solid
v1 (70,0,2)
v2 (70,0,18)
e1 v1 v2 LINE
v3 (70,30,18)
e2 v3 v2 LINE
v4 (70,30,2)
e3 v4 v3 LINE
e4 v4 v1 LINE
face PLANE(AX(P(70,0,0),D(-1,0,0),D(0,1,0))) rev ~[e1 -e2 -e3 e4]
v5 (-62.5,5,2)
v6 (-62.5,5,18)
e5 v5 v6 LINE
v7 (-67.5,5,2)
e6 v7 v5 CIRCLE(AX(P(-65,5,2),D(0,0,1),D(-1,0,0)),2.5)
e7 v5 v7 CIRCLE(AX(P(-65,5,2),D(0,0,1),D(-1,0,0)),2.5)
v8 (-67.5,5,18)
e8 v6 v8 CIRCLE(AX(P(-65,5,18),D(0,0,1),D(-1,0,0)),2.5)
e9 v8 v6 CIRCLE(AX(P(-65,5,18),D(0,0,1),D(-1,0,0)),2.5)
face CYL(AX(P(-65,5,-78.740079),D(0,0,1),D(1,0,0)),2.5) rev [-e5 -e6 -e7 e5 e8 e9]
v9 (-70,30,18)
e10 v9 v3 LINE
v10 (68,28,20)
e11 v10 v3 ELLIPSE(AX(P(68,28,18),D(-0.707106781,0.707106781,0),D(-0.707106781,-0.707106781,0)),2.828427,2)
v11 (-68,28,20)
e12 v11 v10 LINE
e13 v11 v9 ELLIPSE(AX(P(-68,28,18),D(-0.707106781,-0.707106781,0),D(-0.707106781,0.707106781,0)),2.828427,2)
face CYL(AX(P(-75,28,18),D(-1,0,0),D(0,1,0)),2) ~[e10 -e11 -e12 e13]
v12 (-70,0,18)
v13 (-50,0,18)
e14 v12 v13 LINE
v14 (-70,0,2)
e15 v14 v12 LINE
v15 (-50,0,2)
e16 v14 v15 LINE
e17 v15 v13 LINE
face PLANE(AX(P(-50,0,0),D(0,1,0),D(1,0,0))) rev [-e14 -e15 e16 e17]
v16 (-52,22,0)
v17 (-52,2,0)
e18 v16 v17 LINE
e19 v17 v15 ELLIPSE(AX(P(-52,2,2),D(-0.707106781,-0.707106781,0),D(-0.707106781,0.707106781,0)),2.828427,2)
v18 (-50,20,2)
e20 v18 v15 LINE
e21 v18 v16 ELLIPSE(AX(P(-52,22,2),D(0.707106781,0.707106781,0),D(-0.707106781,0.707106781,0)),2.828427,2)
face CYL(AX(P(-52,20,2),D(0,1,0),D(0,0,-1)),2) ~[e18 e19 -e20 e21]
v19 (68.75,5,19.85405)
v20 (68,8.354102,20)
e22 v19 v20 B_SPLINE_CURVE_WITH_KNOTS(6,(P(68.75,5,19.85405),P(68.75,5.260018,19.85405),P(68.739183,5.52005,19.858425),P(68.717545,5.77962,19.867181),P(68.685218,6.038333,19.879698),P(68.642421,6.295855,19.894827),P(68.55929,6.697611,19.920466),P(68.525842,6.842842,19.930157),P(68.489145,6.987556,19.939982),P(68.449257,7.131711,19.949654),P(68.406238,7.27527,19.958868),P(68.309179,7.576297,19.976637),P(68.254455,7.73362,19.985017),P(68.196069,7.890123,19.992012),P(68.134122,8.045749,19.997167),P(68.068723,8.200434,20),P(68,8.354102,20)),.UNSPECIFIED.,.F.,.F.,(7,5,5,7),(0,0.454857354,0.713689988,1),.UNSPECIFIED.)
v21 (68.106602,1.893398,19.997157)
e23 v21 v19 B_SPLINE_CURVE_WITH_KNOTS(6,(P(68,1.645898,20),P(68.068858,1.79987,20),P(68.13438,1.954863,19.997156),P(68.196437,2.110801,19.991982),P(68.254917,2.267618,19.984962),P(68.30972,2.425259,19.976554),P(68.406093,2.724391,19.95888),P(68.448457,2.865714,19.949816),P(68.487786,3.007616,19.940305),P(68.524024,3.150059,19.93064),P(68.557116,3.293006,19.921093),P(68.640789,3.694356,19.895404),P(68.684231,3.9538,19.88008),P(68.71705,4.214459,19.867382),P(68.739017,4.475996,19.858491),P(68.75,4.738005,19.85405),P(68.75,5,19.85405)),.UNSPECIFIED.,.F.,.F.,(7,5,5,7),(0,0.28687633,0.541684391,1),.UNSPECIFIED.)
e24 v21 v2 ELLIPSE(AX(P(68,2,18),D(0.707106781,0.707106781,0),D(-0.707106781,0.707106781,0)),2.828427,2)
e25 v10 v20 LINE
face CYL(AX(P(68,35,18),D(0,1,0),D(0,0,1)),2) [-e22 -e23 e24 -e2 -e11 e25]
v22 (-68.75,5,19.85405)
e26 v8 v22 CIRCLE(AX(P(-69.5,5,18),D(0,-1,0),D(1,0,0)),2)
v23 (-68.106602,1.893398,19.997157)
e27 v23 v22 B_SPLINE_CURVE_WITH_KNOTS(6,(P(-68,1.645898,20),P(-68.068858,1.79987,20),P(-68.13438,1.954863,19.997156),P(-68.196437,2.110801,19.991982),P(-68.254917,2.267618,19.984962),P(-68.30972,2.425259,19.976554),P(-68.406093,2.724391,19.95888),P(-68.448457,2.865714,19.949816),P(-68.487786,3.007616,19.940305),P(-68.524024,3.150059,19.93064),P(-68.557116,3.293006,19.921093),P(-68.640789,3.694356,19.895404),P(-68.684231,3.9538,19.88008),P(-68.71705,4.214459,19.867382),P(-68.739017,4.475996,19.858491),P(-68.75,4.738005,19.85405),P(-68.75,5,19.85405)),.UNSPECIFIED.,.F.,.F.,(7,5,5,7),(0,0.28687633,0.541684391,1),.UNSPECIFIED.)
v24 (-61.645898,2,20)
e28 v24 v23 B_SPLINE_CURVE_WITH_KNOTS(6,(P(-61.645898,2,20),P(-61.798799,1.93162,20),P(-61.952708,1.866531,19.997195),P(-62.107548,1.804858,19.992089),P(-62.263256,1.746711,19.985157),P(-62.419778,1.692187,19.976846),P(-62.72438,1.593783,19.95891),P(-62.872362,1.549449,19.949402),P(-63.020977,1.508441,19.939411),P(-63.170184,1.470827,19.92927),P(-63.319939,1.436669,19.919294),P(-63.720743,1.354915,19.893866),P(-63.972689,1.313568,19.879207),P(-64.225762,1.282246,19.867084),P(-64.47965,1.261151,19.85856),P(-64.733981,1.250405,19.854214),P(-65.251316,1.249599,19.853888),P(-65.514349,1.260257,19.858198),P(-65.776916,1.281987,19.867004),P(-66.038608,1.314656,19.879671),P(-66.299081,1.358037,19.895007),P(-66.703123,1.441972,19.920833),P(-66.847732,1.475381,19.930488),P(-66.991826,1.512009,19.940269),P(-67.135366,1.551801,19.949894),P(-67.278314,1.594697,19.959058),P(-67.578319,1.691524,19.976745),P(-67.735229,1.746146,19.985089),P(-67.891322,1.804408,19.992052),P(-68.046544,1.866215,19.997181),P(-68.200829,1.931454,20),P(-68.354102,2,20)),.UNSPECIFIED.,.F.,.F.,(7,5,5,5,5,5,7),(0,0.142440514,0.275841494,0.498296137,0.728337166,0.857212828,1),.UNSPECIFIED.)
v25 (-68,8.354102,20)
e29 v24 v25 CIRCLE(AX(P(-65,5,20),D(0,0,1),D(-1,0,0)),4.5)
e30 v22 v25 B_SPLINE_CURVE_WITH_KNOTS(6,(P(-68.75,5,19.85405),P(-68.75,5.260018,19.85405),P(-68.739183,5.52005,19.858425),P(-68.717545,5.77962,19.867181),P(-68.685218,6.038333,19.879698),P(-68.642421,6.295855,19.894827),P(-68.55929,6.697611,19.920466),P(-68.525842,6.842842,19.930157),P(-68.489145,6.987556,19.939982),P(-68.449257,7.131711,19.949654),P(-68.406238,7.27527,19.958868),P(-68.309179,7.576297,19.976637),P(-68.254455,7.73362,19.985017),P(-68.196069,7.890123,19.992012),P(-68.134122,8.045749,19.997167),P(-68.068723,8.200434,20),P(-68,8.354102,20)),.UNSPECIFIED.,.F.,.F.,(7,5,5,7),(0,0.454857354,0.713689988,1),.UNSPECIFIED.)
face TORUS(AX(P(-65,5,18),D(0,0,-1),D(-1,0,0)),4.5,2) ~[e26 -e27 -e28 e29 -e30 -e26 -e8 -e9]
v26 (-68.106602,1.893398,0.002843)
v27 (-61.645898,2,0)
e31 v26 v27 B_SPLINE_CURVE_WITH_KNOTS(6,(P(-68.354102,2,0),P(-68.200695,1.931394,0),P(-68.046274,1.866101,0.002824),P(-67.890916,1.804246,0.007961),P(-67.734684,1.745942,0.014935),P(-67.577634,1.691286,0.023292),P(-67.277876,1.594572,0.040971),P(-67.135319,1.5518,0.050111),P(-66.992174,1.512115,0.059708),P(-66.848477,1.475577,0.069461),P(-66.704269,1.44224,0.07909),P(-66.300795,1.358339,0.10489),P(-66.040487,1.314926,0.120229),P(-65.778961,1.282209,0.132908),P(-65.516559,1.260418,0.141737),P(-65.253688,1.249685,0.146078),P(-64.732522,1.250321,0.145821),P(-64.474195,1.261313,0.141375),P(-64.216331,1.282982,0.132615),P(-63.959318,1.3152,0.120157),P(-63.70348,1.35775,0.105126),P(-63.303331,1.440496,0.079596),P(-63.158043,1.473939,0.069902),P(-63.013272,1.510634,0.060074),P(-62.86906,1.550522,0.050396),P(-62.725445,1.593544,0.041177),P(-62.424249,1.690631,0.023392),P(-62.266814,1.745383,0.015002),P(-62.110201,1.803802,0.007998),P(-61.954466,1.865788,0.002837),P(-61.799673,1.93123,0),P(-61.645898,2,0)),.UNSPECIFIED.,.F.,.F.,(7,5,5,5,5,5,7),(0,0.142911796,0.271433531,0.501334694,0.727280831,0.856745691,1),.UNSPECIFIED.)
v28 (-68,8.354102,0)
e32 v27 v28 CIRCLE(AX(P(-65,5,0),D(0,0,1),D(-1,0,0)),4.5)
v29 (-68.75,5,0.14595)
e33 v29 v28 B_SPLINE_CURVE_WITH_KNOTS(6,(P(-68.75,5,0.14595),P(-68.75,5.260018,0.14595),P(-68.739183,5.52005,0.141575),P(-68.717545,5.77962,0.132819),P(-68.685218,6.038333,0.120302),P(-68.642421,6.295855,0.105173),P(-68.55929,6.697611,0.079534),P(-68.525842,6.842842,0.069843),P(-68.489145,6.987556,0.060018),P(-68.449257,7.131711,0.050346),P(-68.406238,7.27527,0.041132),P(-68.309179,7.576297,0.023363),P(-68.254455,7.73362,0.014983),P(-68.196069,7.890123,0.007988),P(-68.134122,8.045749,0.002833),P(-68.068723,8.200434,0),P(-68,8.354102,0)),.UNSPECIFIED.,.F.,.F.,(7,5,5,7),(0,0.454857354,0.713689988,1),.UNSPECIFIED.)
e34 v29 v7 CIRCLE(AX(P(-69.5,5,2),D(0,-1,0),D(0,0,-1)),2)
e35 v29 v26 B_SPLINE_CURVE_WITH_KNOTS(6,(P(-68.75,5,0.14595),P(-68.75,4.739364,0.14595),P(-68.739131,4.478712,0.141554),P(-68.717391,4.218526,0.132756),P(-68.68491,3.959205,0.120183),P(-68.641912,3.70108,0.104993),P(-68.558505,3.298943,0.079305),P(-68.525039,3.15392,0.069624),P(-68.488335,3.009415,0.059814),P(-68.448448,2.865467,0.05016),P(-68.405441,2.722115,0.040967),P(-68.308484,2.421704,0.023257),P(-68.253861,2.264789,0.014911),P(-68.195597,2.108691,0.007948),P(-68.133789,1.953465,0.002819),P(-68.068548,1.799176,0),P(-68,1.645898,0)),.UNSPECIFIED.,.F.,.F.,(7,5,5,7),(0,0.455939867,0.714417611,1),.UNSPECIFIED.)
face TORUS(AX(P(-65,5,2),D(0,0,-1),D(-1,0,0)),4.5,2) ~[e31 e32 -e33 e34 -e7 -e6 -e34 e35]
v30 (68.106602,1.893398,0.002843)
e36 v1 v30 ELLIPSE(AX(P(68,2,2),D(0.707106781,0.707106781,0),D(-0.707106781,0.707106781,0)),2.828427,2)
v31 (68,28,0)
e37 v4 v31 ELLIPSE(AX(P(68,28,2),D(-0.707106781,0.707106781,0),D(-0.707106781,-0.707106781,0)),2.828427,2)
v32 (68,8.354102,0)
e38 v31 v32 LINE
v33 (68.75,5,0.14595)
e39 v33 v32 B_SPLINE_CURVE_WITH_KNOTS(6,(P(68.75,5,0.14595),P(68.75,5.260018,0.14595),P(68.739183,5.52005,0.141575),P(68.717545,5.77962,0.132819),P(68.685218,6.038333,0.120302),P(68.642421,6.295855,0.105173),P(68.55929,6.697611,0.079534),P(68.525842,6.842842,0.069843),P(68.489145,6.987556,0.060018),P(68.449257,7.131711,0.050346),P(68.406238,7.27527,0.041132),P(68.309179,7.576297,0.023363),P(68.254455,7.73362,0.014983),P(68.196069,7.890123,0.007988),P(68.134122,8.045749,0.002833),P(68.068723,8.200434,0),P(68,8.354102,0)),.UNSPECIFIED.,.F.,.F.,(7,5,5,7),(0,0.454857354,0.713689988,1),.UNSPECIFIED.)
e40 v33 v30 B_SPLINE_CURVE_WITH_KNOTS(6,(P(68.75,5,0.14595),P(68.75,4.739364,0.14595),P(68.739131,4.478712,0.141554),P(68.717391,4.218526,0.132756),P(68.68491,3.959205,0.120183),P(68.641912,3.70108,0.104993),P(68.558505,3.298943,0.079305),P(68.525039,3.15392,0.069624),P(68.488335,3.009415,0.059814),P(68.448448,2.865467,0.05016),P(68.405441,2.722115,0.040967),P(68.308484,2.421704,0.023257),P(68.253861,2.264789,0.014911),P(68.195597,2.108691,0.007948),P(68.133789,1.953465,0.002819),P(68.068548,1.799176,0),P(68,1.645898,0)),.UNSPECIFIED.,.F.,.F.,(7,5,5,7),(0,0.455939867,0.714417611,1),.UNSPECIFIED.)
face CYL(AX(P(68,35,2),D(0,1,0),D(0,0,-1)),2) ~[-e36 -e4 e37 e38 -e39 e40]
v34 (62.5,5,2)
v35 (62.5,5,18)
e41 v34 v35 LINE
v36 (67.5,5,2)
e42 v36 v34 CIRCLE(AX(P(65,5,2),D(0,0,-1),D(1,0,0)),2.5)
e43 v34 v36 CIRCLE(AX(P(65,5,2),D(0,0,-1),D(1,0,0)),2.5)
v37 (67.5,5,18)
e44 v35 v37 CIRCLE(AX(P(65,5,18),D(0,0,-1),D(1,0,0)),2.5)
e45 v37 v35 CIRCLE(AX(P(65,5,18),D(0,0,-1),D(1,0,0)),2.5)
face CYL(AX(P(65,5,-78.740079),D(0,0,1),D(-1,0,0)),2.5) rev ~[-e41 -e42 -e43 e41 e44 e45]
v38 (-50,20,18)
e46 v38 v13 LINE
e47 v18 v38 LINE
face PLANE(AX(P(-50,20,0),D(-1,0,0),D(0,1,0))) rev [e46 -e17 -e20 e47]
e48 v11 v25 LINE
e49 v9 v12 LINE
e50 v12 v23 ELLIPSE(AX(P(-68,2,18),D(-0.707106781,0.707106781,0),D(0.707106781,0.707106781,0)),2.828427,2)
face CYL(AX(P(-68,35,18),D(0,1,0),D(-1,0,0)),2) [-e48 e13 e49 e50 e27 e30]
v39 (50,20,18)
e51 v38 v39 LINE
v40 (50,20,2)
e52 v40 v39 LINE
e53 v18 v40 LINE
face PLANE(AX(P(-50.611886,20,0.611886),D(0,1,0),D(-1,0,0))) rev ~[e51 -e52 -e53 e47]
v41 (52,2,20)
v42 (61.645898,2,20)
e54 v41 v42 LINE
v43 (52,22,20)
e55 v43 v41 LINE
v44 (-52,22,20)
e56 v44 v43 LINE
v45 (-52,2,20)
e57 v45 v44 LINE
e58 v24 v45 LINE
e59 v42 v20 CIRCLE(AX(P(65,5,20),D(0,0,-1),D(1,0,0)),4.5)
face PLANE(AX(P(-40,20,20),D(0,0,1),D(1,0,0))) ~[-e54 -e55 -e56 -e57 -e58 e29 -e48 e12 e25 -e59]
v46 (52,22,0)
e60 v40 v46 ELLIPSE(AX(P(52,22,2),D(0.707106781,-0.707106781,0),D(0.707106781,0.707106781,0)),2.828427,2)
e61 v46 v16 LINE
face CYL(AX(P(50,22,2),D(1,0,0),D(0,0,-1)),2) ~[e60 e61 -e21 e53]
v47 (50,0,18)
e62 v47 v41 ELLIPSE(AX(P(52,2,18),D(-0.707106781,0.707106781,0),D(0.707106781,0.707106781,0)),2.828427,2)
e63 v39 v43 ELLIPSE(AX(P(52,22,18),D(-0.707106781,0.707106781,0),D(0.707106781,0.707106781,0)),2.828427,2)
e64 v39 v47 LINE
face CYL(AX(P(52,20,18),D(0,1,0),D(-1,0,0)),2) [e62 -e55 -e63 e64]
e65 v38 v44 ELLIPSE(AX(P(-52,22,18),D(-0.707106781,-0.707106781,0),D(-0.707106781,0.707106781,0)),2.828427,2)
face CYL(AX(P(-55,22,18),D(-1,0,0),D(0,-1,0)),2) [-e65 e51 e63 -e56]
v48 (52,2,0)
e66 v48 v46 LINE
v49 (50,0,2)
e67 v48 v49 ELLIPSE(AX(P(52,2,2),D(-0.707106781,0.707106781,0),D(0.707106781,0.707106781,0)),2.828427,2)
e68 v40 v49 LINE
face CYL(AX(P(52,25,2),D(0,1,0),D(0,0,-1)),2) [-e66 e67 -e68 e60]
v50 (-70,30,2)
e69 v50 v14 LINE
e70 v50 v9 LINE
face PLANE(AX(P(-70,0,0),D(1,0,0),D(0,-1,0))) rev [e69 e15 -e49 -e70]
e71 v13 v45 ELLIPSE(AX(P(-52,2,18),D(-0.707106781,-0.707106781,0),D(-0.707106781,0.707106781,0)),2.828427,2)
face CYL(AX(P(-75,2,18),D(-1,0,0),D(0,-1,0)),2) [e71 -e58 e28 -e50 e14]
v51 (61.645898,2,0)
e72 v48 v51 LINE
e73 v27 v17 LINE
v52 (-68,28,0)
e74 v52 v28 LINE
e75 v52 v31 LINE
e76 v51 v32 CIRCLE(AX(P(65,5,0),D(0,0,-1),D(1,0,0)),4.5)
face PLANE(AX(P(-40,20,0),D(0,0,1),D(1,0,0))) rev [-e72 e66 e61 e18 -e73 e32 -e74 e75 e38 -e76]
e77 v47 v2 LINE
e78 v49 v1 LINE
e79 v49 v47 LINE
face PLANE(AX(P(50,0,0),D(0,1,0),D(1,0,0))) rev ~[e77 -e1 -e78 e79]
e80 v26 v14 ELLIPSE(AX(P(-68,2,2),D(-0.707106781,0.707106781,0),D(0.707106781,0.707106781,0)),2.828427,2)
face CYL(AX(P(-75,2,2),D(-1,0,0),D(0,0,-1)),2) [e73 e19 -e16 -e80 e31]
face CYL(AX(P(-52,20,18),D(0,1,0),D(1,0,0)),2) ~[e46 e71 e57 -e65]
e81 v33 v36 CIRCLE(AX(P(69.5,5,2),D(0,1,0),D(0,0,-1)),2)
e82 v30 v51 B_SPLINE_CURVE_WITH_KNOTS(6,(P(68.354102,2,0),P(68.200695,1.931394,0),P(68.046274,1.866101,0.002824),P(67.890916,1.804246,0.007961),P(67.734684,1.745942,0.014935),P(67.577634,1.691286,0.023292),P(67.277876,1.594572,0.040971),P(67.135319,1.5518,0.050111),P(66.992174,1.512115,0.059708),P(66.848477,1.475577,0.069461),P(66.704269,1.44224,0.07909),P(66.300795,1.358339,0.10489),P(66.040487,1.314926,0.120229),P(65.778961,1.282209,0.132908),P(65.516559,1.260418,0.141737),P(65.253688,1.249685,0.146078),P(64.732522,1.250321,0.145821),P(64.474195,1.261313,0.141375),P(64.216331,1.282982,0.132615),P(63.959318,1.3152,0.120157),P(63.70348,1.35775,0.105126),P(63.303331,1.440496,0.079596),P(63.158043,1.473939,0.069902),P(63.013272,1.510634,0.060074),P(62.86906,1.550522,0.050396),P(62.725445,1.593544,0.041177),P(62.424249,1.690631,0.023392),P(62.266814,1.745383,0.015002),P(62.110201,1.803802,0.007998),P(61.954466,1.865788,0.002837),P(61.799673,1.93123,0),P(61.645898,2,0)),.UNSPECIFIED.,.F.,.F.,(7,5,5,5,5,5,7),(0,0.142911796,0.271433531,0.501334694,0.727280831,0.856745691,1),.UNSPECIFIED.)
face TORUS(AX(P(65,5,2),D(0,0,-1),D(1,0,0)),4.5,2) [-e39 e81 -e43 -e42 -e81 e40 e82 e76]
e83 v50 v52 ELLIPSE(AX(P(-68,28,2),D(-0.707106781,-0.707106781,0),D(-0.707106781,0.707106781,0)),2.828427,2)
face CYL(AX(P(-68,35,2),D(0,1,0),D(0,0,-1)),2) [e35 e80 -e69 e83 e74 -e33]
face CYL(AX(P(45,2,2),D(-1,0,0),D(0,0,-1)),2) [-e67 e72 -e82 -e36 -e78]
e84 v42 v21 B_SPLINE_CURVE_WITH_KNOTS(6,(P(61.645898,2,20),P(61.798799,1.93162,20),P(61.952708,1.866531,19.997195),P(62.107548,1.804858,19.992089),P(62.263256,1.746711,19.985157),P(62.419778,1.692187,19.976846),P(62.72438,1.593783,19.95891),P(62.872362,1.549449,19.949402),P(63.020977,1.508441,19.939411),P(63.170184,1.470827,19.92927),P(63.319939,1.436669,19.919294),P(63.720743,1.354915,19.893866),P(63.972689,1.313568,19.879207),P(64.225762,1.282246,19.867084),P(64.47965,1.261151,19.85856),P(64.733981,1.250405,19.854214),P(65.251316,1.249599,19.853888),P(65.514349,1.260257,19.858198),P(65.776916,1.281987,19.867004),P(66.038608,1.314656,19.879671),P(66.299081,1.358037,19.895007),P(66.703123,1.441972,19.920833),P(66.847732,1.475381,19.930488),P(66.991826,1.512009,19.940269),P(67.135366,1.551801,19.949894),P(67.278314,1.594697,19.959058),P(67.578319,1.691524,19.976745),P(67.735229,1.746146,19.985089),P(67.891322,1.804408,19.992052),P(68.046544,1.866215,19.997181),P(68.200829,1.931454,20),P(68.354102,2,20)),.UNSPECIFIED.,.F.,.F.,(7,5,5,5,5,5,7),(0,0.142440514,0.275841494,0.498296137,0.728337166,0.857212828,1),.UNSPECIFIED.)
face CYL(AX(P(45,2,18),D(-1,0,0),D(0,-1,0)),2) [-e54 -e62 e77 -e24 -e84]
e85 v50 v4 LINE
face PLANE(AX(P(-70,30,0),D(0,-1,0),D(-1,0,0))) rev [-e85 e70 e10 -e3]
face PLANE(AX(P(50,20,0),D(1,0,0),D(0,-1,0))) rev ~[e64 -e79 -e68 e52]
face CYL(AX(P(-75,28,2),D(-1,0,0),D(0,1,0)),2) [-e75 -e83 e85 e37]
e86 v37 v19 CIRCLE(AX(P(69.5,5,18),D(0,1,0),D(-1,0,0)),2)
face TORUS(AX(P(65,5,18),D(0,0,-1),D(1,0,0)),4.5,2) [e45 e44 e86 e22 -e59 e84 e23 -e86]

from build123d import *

# Parameters (mm, degrees)
F1_DEPTH     = 20
F3_D         = 5
F5_T1_DEPTH  = 150
F5_T3_DEPTH  = 40
F5_T5_DEPTH  = 30
F5_T7_DEPTH  = 25
F5_T9_DEPTH  = 100
F5_T11_DEPTH = 30
F5_T25_DEPTH = 105
F5_T29_DEPTH = 30
F5_T36_DEPTH = 30
F5_T40_DEPTH = 105
F5_T47_DEPTH = 30
F5_T51_DEPTH = 105
F5_T58_DEPTH = 105
F5_T62_DEPTH = 30


# Not quite as in the source:
# - a fillet or chamfer that OpenCascade refuses, or shapes differently, is made with other operations: its cross-section is extruded or revolved along the edge and cut away or added


with BuildPart() as f1:
    # F0 (on Top) → F1 (new body)
    with BuildSketch(Plane.XY):
        Polygon((70, 30), (0, 30), (0, 20), (50, 20), (50, 0), (70, 0), align=None)
    extrude(amount=F1_DEPTH)

    # F3 (through all)
    with Locations(Plane(origin=(0, 0, 0), x_dir=(1, 0, 0), z_dir=(0, 0, -1))):
        with Locations((65, -5)):
            Hole(F3_D / 2)

    # F4: F1 across face


with BuildPart() as f1_1:
    add(f1.part)
    add(f1.part.mirror(Plane(origin=(0, 25, 10), x_dir=(0, -1, 0), z_dir=(-1, 0, 0))))

    # F5: fillet of radius 2 on 20 edges, made by hand

    # F5_s2 → F5_t1 (cut)
    with BuildSketch(Plane.YZ.offset(-75)):
        with BuildLine():
            ThreePointArc((30, 18), (29.4142135624, 19.4142135624), (28, 20))
            Line((28, 20), (30, 20))
            Line((30, 20), (30, 18))
        make_face()
        with BuildLine():
            ThreePointArc((30, 2), (29.4142135624, 0.5857864376), (28, 0))
            Line((28, 0), (30, 0))
            Line((30, 0), (30, 2))
        make_face()
    extrude(amount=F5_T1_DEPTH, mode=Mode.SUBTRACT)

    # F5_s4 → F5_t3 (cut)
    with BuildSketch(Plane.XZ.offset(-35)):
        with BuildLine():
            ThreePointArc((-70, 18), (-69.4142135624, 19.4142135624), (-68, 20))
            Line((-68, 20), (-70, 20))
            Line((-70, 20), (-70, 18))
        make_face()
        with BuildLine():
            ThreePointArc((68, 20), (69.4142135624, 19.4142135624), (70, 18))
            Line((70, 18), (70, 20))
            Line((70, 20), (68, 20))
        make_face()
        with BuildLine():
            ThreePointArc((-68, 0), (-69.4142135624, 0.5857864376), (-70, 2))
            Line((-70, 2), (-70, 0))
            Line((-70, 0), (-68, 0))
        make_face()
        with BuildLine():
            ThreePointArc((68, 0), (69.4142135624, 0.5857864376), (70, 2))
            Line((70, 2), (70, 0))
            Line((70, 0), (68, 0))
        make_face()
    extrude(amount=F5_T3_DEPTH, mode=Mode.SUBTRACT)

    # F5_s6 → F5_t5 (cut)
    with BuildSketch(Plane.YZ.offset(-75)):
        with BuildLine():
            ThreePointArc((0, 18), (0.5857864376, 19.4142135624), (2, 20))
            Line((2, 20), (0, 20))
            Line((0, 20), (0, 18))
        make_face()
        with BuildLine():
            ThreePointArc((2, 0), (0.5857864376, 0.5857864376), (0, 2))
            Line((0, 2), (0, 0))
            Line((0, 0), (2, 0))
        make_face()
    extrude(amount=F5_T5_DEPTH, mode=Mode.SUBTRACT)

    # F5_s8 → F5_t7 (cut)
    with BuildSketch(Plane.XZ.offset(-20)):
        with BuildLine():
            ThreePointArc((-50, 18), (-50.5857864376, 19.4142135624), (-52, 20))
            Line((-52, 20), (-50, 20))
            Line((-50, 20), (-50, 18))
        make_face()
        with BuildLine():
            ThreePointArc((50, 18), (50.5857864376, 19.4142135624), (52, 20))
            Line((52, 20), (50, 20))
            Line((50, 20), (50, 18))
        make_face()
        with BuildLine():
            ThreePointArc((-52, 0), (-50.5857864376, 0.5857864376), (-50, 2))
            Line((-50, 2), (-50, 0))
            Line((-50, 0), (-52, 0))
        make_face()
        with BuildLine():
            ThreePointArc((52, 0), (50.5857864376, 0.5857864376), (50, 2))
            Line((50, 2), (50, 0))
            Line((50, 0), (52, 0))
        make_face()
    extrude(amount=F5_T7_DEPTH, mode=Mode.SUBTRACT)

    # F5_s10 → F5_t9 (cut)
    with BuildSketch(Plane.YZ.offset(-50)):
        with BuildLine():
            ThreePointArc((20, 18), (20.5857864376, 19.4142135624), (22, 20))
            Line((22, 20), (20, 20))
            Line((20, 20), (20, 18))
        make_face()
        with BuildLine():
            ThreePointArc((22, 0), (20.5857864376, 0.5857864376), (20, 2))
            Line((20, 2), (20, 0))
            Line((20, 0), (22, 0))
        make_face()
    extrude(amount=F5_T9_DEPTH, mode=Mode.SUBTRACT)

    # F5_s12 → F5_t11 (cut)
    with BuildSketch(Plane.YZ.offset(45)):
        with BuildLine():
            ThreePointArc((0, 18), (0.5857864376, 19.4142135624), (2, 20))
            Line((2, 20), (0, 20))
            Line((0, 20), (0, 18))
        make_face()
        with BuildLine():
            ThreePointArc((2, 0), (0.5857864376, 0.5857864376), (0, 2))
            Line((0, 2), (0, 0))
            Line((0, 0), (2, 0))
        make_face()
    extrude(amount=F5_T11_DEPTH, mode=Mode.SUBTRACT)

    # F5_s13 → F5_t14 (revolve, cut)
    with BuildSketch(Plane.XZ.offset(-5)):
        with BuildLine():
            ThreePointArc((67.5, 18), (68.0857864376, 19.4142135624), (69.5, 20))
            Line((69.5, 20), (67.5, 20))
            Line((67.5, 20), (67.5, 18))
        make_face()
    revolve(axis=Axis((65, 5, 20), (0, 0, -1)), mode=Mode.SUBTRACT)

    # F5_s15 → F5_t16 (revolve, cut)
    with BuildSketch(Plane.XZ.offset(-5)):
        with BuildLine():
            ThreePointArc((-67.5, 18), (-68.0857864376, 19.4142135624), (-69.5, 20))
            Line((-69.5, 20), (-67.5, 20))
            Line((-67.5, 20), (-67.5, 18))
        make_face()
    revolve(axis=Axis((-65, 5, 20), (0, 0, 1)), mode=Mode.SUBTRACT)

    # F5_s17 → F5_t18 (revolve, cut)
    with BuildSketch(Plane.XZ.offset(-5)):
        with BuildLine():
            ThreePointArc((69.5, 0), (68.0857864376, 0.5857864376), (67.5, 2))
            Line((67.5, 2), (67.5, 0))
            Line((67.5, 0), (69.5, 0))
        make_face()
    revolve(axis=Axis((65, 5, 0), (0, 0, -1)), mode=Mode.SUBTRACT)

    # F5_s19 → F5_t20 (revolve, cut)
    with BuildSketch(Plane.XZ.offset(-5)):
        with BuildLine():
            ThreePointArc((-69.5, 0), (-68.0857864376, 0.5857864376), (-67.5, 2))
            Line((-67.5, 2), (-67.5, 0))
            Line((-67.5, 0), (-69.5, 0))
        make_face()
    revolve(axis=Axis((-65, 5, 0), (0, 0, 1)), mode=Mode.SUBTRACT)


with BuildPart() as f5_tool23:
    # F5_s24 → F5_t25 (new body)
    with BuildSketch(Plane.YZ.offset(-55)):
        with BuildLine():
            ThreePointArc((20, 18), (20.5857864376, 19.4142135624), (22, 20))
            Line((22, 20), (20, 20))
            Line((20, 20), (20, 18))
        make_face()
    extrude(amount=F5_T25_DEPTH)

    split(bisect_by=Plane.YZ.offset(-50), keep=Keep.BOTTOM)


with BuildPart() as f5_tool27:
    # F5_s28 → F5_t29 (new body)
    with BuildSketch(Plane.XZ.offset(-25)):
        with BuildLine():
            ThreePointArc((-50, 18), (-50.5857864376, 19.4142135624), (-52, 20))
            Line((-52, 20), (-50, 20))
            Line((-50, 20), (-50, 18))
        make_face()
    extrude(amount=F5_T29_DEPTH)

    split(bisect_by=Plane.XZ.offset(-20), keep=Keep.BOTTOM)


with BuildPart() as f5_tool23_1:
    add(f5_tool23.part)

    # F5_t31: intersect F5_tool27
    add(f5_tool27.part, mode=Mode.INTERSECT)


with BuildPart() as f1_2:
    add(f1_1.part)

    # F5_t21: cut F5_tool23
    add(f5_tool23_1.part, mode=Mode.SUBTRACT)


with BuildPart() as f5_tool34:
    # F5_s35 → F5_t36 (new body)
    with BuildSketch(Plane.XZ.offset(-25)):
        with BuildLine():
            ThreePointArc((50, 18), (50.5857864376, 19.4142135624), (52, 20))
            Line((52, 20), (50, 20))
            Line((50, 20), (50, 18))
        make_face()
    extrude(amount=F5_T36_DEPTH)

    split(bisect_by=Plane.XZ.offset(-20), keep=Keep.BOTTOM)


with BuildPart() as f5_tool38:
    # F5_s39 → F5_t40 (new body)
    with BuildSketch(Plane.YZ.offset(-50)):
        with BuildLine():
            ThreePointArc((20, 18), (20.5857864376, 19.4142135624), (22, 20))
            Line((22, 20), (20, 20))
            Line((20, 20), (20, 18))
        make_face()
    extrude(amount=F5_T40_DEPTH)

    split(bisect_by=Plane.YZ.offset(50), keep=Keep.TOP)


with BuildPart() as f5_tool34_1:
    add(f5_tool34.part)

    # F5_t42: intersect F5_tool38
    add(f5_tool38.part, mode=Mode.INTERSECT)


with BuildPart() as f1_3:
    add(f1_2.part)

    # F5_t32: cut F5_tool34
    add(f5_tool34_1.part, mode=Mode.SUBTRACT)


with BuildPart() as f5_tool45:
    # F5_s46 → F5_t47 (new body)
    with BuildSketch(Plane.XZ.offset(-25)):
        with BuildLine():
            ThreePointArc((-52, 0), (-50.5857864376, 0.5857864376), (-50, 2))
            Line((-50, 2), (-50, 0))
            Line((-50, 0), (-52, 0))
        make_face()
    extrude(amount=F5_T47_DEPTH)

    split(bisect_by=Plane.XZ.offset(-20), keep=Keep.BOTTOM)


with BuildPart() as f5_tool49:
    # F5_s50 → F5_t51 (new body)
    with BuildSketch(Plane.YZ.offset(50)):
        with BuildLine():
            ThreePointArc((22, 0), (20.5857864376, 0.5857864376), (20, 2))
            Line((20, 2), (20, 0))
            Line((20, 0), (22, 0))
        make_face()
    extrude(amount=-F5_T51_DEPTH)

    split(bisect_by=Plane.YZ.offset(-50), keep=Keep.BOTTOM)


with BuildPart() as f5_tool45_1:
    add(f5_tool45.part)

    # F5_t53: intersect F5_tool49
    add(f5_tool49.part, mode=Mode.INTERSECT)


with BuildPart() as f1_4:
    add(f1_3.part)

    # F5_t43: cut F5_tool45
    add(f5_tool45_1.part, mode=Mode.SUBTRACT)


with BuildPart() as f5_tool56:
    # F5_s57 → F5_t58 (new body)
    with BuildSketch(Plane.YZ.offset(55)):
        with BuildLine():
            ThreePointArc((22, 0), (20.5857864376, 0.5857864376), (20, 2))
            Line((20, 2), (20, 0))
            Line((20, 0), (22, 0))
        make_face()
    extrude(amount=-F5_T58_DEPTH)

    split(bisect_by=Plane.YZ.offset(50), keep=Keep.TOP)


with BuildPart() as f5_tool60:
    # F5_s61 → F5_t62 (new body)
    with BuildSketch(Plane.XZ.offset(-25)):
        with BuildLine():
            ThreePointArc((52, 0), (50.5857864376, 0.5857864376), (50, 2))
            Line((50, 2), (50, 0))
            Line((50, 0), (52, 0))
        make_face()
    extrude(amount=F5_T62_DEPTH)

    split(bisect_by=Plane.XZ.offset(-20), keep=Keep.BOTTOM)


with BuildPart() as f5_tool56_1:
    add(f5_tool56.part)

    # F5_t64: intersect F5_tool60
    add(f5_tool60.part, mode=Mode.INTERSECT)


with BuildPart() as f1_5:
    add(f1_4.part)

    # F5_t54: cut F5_tool56
    add(f5_tool56_1.part, mode=Mode.SUBTRACT)


solid = f1_5.part
